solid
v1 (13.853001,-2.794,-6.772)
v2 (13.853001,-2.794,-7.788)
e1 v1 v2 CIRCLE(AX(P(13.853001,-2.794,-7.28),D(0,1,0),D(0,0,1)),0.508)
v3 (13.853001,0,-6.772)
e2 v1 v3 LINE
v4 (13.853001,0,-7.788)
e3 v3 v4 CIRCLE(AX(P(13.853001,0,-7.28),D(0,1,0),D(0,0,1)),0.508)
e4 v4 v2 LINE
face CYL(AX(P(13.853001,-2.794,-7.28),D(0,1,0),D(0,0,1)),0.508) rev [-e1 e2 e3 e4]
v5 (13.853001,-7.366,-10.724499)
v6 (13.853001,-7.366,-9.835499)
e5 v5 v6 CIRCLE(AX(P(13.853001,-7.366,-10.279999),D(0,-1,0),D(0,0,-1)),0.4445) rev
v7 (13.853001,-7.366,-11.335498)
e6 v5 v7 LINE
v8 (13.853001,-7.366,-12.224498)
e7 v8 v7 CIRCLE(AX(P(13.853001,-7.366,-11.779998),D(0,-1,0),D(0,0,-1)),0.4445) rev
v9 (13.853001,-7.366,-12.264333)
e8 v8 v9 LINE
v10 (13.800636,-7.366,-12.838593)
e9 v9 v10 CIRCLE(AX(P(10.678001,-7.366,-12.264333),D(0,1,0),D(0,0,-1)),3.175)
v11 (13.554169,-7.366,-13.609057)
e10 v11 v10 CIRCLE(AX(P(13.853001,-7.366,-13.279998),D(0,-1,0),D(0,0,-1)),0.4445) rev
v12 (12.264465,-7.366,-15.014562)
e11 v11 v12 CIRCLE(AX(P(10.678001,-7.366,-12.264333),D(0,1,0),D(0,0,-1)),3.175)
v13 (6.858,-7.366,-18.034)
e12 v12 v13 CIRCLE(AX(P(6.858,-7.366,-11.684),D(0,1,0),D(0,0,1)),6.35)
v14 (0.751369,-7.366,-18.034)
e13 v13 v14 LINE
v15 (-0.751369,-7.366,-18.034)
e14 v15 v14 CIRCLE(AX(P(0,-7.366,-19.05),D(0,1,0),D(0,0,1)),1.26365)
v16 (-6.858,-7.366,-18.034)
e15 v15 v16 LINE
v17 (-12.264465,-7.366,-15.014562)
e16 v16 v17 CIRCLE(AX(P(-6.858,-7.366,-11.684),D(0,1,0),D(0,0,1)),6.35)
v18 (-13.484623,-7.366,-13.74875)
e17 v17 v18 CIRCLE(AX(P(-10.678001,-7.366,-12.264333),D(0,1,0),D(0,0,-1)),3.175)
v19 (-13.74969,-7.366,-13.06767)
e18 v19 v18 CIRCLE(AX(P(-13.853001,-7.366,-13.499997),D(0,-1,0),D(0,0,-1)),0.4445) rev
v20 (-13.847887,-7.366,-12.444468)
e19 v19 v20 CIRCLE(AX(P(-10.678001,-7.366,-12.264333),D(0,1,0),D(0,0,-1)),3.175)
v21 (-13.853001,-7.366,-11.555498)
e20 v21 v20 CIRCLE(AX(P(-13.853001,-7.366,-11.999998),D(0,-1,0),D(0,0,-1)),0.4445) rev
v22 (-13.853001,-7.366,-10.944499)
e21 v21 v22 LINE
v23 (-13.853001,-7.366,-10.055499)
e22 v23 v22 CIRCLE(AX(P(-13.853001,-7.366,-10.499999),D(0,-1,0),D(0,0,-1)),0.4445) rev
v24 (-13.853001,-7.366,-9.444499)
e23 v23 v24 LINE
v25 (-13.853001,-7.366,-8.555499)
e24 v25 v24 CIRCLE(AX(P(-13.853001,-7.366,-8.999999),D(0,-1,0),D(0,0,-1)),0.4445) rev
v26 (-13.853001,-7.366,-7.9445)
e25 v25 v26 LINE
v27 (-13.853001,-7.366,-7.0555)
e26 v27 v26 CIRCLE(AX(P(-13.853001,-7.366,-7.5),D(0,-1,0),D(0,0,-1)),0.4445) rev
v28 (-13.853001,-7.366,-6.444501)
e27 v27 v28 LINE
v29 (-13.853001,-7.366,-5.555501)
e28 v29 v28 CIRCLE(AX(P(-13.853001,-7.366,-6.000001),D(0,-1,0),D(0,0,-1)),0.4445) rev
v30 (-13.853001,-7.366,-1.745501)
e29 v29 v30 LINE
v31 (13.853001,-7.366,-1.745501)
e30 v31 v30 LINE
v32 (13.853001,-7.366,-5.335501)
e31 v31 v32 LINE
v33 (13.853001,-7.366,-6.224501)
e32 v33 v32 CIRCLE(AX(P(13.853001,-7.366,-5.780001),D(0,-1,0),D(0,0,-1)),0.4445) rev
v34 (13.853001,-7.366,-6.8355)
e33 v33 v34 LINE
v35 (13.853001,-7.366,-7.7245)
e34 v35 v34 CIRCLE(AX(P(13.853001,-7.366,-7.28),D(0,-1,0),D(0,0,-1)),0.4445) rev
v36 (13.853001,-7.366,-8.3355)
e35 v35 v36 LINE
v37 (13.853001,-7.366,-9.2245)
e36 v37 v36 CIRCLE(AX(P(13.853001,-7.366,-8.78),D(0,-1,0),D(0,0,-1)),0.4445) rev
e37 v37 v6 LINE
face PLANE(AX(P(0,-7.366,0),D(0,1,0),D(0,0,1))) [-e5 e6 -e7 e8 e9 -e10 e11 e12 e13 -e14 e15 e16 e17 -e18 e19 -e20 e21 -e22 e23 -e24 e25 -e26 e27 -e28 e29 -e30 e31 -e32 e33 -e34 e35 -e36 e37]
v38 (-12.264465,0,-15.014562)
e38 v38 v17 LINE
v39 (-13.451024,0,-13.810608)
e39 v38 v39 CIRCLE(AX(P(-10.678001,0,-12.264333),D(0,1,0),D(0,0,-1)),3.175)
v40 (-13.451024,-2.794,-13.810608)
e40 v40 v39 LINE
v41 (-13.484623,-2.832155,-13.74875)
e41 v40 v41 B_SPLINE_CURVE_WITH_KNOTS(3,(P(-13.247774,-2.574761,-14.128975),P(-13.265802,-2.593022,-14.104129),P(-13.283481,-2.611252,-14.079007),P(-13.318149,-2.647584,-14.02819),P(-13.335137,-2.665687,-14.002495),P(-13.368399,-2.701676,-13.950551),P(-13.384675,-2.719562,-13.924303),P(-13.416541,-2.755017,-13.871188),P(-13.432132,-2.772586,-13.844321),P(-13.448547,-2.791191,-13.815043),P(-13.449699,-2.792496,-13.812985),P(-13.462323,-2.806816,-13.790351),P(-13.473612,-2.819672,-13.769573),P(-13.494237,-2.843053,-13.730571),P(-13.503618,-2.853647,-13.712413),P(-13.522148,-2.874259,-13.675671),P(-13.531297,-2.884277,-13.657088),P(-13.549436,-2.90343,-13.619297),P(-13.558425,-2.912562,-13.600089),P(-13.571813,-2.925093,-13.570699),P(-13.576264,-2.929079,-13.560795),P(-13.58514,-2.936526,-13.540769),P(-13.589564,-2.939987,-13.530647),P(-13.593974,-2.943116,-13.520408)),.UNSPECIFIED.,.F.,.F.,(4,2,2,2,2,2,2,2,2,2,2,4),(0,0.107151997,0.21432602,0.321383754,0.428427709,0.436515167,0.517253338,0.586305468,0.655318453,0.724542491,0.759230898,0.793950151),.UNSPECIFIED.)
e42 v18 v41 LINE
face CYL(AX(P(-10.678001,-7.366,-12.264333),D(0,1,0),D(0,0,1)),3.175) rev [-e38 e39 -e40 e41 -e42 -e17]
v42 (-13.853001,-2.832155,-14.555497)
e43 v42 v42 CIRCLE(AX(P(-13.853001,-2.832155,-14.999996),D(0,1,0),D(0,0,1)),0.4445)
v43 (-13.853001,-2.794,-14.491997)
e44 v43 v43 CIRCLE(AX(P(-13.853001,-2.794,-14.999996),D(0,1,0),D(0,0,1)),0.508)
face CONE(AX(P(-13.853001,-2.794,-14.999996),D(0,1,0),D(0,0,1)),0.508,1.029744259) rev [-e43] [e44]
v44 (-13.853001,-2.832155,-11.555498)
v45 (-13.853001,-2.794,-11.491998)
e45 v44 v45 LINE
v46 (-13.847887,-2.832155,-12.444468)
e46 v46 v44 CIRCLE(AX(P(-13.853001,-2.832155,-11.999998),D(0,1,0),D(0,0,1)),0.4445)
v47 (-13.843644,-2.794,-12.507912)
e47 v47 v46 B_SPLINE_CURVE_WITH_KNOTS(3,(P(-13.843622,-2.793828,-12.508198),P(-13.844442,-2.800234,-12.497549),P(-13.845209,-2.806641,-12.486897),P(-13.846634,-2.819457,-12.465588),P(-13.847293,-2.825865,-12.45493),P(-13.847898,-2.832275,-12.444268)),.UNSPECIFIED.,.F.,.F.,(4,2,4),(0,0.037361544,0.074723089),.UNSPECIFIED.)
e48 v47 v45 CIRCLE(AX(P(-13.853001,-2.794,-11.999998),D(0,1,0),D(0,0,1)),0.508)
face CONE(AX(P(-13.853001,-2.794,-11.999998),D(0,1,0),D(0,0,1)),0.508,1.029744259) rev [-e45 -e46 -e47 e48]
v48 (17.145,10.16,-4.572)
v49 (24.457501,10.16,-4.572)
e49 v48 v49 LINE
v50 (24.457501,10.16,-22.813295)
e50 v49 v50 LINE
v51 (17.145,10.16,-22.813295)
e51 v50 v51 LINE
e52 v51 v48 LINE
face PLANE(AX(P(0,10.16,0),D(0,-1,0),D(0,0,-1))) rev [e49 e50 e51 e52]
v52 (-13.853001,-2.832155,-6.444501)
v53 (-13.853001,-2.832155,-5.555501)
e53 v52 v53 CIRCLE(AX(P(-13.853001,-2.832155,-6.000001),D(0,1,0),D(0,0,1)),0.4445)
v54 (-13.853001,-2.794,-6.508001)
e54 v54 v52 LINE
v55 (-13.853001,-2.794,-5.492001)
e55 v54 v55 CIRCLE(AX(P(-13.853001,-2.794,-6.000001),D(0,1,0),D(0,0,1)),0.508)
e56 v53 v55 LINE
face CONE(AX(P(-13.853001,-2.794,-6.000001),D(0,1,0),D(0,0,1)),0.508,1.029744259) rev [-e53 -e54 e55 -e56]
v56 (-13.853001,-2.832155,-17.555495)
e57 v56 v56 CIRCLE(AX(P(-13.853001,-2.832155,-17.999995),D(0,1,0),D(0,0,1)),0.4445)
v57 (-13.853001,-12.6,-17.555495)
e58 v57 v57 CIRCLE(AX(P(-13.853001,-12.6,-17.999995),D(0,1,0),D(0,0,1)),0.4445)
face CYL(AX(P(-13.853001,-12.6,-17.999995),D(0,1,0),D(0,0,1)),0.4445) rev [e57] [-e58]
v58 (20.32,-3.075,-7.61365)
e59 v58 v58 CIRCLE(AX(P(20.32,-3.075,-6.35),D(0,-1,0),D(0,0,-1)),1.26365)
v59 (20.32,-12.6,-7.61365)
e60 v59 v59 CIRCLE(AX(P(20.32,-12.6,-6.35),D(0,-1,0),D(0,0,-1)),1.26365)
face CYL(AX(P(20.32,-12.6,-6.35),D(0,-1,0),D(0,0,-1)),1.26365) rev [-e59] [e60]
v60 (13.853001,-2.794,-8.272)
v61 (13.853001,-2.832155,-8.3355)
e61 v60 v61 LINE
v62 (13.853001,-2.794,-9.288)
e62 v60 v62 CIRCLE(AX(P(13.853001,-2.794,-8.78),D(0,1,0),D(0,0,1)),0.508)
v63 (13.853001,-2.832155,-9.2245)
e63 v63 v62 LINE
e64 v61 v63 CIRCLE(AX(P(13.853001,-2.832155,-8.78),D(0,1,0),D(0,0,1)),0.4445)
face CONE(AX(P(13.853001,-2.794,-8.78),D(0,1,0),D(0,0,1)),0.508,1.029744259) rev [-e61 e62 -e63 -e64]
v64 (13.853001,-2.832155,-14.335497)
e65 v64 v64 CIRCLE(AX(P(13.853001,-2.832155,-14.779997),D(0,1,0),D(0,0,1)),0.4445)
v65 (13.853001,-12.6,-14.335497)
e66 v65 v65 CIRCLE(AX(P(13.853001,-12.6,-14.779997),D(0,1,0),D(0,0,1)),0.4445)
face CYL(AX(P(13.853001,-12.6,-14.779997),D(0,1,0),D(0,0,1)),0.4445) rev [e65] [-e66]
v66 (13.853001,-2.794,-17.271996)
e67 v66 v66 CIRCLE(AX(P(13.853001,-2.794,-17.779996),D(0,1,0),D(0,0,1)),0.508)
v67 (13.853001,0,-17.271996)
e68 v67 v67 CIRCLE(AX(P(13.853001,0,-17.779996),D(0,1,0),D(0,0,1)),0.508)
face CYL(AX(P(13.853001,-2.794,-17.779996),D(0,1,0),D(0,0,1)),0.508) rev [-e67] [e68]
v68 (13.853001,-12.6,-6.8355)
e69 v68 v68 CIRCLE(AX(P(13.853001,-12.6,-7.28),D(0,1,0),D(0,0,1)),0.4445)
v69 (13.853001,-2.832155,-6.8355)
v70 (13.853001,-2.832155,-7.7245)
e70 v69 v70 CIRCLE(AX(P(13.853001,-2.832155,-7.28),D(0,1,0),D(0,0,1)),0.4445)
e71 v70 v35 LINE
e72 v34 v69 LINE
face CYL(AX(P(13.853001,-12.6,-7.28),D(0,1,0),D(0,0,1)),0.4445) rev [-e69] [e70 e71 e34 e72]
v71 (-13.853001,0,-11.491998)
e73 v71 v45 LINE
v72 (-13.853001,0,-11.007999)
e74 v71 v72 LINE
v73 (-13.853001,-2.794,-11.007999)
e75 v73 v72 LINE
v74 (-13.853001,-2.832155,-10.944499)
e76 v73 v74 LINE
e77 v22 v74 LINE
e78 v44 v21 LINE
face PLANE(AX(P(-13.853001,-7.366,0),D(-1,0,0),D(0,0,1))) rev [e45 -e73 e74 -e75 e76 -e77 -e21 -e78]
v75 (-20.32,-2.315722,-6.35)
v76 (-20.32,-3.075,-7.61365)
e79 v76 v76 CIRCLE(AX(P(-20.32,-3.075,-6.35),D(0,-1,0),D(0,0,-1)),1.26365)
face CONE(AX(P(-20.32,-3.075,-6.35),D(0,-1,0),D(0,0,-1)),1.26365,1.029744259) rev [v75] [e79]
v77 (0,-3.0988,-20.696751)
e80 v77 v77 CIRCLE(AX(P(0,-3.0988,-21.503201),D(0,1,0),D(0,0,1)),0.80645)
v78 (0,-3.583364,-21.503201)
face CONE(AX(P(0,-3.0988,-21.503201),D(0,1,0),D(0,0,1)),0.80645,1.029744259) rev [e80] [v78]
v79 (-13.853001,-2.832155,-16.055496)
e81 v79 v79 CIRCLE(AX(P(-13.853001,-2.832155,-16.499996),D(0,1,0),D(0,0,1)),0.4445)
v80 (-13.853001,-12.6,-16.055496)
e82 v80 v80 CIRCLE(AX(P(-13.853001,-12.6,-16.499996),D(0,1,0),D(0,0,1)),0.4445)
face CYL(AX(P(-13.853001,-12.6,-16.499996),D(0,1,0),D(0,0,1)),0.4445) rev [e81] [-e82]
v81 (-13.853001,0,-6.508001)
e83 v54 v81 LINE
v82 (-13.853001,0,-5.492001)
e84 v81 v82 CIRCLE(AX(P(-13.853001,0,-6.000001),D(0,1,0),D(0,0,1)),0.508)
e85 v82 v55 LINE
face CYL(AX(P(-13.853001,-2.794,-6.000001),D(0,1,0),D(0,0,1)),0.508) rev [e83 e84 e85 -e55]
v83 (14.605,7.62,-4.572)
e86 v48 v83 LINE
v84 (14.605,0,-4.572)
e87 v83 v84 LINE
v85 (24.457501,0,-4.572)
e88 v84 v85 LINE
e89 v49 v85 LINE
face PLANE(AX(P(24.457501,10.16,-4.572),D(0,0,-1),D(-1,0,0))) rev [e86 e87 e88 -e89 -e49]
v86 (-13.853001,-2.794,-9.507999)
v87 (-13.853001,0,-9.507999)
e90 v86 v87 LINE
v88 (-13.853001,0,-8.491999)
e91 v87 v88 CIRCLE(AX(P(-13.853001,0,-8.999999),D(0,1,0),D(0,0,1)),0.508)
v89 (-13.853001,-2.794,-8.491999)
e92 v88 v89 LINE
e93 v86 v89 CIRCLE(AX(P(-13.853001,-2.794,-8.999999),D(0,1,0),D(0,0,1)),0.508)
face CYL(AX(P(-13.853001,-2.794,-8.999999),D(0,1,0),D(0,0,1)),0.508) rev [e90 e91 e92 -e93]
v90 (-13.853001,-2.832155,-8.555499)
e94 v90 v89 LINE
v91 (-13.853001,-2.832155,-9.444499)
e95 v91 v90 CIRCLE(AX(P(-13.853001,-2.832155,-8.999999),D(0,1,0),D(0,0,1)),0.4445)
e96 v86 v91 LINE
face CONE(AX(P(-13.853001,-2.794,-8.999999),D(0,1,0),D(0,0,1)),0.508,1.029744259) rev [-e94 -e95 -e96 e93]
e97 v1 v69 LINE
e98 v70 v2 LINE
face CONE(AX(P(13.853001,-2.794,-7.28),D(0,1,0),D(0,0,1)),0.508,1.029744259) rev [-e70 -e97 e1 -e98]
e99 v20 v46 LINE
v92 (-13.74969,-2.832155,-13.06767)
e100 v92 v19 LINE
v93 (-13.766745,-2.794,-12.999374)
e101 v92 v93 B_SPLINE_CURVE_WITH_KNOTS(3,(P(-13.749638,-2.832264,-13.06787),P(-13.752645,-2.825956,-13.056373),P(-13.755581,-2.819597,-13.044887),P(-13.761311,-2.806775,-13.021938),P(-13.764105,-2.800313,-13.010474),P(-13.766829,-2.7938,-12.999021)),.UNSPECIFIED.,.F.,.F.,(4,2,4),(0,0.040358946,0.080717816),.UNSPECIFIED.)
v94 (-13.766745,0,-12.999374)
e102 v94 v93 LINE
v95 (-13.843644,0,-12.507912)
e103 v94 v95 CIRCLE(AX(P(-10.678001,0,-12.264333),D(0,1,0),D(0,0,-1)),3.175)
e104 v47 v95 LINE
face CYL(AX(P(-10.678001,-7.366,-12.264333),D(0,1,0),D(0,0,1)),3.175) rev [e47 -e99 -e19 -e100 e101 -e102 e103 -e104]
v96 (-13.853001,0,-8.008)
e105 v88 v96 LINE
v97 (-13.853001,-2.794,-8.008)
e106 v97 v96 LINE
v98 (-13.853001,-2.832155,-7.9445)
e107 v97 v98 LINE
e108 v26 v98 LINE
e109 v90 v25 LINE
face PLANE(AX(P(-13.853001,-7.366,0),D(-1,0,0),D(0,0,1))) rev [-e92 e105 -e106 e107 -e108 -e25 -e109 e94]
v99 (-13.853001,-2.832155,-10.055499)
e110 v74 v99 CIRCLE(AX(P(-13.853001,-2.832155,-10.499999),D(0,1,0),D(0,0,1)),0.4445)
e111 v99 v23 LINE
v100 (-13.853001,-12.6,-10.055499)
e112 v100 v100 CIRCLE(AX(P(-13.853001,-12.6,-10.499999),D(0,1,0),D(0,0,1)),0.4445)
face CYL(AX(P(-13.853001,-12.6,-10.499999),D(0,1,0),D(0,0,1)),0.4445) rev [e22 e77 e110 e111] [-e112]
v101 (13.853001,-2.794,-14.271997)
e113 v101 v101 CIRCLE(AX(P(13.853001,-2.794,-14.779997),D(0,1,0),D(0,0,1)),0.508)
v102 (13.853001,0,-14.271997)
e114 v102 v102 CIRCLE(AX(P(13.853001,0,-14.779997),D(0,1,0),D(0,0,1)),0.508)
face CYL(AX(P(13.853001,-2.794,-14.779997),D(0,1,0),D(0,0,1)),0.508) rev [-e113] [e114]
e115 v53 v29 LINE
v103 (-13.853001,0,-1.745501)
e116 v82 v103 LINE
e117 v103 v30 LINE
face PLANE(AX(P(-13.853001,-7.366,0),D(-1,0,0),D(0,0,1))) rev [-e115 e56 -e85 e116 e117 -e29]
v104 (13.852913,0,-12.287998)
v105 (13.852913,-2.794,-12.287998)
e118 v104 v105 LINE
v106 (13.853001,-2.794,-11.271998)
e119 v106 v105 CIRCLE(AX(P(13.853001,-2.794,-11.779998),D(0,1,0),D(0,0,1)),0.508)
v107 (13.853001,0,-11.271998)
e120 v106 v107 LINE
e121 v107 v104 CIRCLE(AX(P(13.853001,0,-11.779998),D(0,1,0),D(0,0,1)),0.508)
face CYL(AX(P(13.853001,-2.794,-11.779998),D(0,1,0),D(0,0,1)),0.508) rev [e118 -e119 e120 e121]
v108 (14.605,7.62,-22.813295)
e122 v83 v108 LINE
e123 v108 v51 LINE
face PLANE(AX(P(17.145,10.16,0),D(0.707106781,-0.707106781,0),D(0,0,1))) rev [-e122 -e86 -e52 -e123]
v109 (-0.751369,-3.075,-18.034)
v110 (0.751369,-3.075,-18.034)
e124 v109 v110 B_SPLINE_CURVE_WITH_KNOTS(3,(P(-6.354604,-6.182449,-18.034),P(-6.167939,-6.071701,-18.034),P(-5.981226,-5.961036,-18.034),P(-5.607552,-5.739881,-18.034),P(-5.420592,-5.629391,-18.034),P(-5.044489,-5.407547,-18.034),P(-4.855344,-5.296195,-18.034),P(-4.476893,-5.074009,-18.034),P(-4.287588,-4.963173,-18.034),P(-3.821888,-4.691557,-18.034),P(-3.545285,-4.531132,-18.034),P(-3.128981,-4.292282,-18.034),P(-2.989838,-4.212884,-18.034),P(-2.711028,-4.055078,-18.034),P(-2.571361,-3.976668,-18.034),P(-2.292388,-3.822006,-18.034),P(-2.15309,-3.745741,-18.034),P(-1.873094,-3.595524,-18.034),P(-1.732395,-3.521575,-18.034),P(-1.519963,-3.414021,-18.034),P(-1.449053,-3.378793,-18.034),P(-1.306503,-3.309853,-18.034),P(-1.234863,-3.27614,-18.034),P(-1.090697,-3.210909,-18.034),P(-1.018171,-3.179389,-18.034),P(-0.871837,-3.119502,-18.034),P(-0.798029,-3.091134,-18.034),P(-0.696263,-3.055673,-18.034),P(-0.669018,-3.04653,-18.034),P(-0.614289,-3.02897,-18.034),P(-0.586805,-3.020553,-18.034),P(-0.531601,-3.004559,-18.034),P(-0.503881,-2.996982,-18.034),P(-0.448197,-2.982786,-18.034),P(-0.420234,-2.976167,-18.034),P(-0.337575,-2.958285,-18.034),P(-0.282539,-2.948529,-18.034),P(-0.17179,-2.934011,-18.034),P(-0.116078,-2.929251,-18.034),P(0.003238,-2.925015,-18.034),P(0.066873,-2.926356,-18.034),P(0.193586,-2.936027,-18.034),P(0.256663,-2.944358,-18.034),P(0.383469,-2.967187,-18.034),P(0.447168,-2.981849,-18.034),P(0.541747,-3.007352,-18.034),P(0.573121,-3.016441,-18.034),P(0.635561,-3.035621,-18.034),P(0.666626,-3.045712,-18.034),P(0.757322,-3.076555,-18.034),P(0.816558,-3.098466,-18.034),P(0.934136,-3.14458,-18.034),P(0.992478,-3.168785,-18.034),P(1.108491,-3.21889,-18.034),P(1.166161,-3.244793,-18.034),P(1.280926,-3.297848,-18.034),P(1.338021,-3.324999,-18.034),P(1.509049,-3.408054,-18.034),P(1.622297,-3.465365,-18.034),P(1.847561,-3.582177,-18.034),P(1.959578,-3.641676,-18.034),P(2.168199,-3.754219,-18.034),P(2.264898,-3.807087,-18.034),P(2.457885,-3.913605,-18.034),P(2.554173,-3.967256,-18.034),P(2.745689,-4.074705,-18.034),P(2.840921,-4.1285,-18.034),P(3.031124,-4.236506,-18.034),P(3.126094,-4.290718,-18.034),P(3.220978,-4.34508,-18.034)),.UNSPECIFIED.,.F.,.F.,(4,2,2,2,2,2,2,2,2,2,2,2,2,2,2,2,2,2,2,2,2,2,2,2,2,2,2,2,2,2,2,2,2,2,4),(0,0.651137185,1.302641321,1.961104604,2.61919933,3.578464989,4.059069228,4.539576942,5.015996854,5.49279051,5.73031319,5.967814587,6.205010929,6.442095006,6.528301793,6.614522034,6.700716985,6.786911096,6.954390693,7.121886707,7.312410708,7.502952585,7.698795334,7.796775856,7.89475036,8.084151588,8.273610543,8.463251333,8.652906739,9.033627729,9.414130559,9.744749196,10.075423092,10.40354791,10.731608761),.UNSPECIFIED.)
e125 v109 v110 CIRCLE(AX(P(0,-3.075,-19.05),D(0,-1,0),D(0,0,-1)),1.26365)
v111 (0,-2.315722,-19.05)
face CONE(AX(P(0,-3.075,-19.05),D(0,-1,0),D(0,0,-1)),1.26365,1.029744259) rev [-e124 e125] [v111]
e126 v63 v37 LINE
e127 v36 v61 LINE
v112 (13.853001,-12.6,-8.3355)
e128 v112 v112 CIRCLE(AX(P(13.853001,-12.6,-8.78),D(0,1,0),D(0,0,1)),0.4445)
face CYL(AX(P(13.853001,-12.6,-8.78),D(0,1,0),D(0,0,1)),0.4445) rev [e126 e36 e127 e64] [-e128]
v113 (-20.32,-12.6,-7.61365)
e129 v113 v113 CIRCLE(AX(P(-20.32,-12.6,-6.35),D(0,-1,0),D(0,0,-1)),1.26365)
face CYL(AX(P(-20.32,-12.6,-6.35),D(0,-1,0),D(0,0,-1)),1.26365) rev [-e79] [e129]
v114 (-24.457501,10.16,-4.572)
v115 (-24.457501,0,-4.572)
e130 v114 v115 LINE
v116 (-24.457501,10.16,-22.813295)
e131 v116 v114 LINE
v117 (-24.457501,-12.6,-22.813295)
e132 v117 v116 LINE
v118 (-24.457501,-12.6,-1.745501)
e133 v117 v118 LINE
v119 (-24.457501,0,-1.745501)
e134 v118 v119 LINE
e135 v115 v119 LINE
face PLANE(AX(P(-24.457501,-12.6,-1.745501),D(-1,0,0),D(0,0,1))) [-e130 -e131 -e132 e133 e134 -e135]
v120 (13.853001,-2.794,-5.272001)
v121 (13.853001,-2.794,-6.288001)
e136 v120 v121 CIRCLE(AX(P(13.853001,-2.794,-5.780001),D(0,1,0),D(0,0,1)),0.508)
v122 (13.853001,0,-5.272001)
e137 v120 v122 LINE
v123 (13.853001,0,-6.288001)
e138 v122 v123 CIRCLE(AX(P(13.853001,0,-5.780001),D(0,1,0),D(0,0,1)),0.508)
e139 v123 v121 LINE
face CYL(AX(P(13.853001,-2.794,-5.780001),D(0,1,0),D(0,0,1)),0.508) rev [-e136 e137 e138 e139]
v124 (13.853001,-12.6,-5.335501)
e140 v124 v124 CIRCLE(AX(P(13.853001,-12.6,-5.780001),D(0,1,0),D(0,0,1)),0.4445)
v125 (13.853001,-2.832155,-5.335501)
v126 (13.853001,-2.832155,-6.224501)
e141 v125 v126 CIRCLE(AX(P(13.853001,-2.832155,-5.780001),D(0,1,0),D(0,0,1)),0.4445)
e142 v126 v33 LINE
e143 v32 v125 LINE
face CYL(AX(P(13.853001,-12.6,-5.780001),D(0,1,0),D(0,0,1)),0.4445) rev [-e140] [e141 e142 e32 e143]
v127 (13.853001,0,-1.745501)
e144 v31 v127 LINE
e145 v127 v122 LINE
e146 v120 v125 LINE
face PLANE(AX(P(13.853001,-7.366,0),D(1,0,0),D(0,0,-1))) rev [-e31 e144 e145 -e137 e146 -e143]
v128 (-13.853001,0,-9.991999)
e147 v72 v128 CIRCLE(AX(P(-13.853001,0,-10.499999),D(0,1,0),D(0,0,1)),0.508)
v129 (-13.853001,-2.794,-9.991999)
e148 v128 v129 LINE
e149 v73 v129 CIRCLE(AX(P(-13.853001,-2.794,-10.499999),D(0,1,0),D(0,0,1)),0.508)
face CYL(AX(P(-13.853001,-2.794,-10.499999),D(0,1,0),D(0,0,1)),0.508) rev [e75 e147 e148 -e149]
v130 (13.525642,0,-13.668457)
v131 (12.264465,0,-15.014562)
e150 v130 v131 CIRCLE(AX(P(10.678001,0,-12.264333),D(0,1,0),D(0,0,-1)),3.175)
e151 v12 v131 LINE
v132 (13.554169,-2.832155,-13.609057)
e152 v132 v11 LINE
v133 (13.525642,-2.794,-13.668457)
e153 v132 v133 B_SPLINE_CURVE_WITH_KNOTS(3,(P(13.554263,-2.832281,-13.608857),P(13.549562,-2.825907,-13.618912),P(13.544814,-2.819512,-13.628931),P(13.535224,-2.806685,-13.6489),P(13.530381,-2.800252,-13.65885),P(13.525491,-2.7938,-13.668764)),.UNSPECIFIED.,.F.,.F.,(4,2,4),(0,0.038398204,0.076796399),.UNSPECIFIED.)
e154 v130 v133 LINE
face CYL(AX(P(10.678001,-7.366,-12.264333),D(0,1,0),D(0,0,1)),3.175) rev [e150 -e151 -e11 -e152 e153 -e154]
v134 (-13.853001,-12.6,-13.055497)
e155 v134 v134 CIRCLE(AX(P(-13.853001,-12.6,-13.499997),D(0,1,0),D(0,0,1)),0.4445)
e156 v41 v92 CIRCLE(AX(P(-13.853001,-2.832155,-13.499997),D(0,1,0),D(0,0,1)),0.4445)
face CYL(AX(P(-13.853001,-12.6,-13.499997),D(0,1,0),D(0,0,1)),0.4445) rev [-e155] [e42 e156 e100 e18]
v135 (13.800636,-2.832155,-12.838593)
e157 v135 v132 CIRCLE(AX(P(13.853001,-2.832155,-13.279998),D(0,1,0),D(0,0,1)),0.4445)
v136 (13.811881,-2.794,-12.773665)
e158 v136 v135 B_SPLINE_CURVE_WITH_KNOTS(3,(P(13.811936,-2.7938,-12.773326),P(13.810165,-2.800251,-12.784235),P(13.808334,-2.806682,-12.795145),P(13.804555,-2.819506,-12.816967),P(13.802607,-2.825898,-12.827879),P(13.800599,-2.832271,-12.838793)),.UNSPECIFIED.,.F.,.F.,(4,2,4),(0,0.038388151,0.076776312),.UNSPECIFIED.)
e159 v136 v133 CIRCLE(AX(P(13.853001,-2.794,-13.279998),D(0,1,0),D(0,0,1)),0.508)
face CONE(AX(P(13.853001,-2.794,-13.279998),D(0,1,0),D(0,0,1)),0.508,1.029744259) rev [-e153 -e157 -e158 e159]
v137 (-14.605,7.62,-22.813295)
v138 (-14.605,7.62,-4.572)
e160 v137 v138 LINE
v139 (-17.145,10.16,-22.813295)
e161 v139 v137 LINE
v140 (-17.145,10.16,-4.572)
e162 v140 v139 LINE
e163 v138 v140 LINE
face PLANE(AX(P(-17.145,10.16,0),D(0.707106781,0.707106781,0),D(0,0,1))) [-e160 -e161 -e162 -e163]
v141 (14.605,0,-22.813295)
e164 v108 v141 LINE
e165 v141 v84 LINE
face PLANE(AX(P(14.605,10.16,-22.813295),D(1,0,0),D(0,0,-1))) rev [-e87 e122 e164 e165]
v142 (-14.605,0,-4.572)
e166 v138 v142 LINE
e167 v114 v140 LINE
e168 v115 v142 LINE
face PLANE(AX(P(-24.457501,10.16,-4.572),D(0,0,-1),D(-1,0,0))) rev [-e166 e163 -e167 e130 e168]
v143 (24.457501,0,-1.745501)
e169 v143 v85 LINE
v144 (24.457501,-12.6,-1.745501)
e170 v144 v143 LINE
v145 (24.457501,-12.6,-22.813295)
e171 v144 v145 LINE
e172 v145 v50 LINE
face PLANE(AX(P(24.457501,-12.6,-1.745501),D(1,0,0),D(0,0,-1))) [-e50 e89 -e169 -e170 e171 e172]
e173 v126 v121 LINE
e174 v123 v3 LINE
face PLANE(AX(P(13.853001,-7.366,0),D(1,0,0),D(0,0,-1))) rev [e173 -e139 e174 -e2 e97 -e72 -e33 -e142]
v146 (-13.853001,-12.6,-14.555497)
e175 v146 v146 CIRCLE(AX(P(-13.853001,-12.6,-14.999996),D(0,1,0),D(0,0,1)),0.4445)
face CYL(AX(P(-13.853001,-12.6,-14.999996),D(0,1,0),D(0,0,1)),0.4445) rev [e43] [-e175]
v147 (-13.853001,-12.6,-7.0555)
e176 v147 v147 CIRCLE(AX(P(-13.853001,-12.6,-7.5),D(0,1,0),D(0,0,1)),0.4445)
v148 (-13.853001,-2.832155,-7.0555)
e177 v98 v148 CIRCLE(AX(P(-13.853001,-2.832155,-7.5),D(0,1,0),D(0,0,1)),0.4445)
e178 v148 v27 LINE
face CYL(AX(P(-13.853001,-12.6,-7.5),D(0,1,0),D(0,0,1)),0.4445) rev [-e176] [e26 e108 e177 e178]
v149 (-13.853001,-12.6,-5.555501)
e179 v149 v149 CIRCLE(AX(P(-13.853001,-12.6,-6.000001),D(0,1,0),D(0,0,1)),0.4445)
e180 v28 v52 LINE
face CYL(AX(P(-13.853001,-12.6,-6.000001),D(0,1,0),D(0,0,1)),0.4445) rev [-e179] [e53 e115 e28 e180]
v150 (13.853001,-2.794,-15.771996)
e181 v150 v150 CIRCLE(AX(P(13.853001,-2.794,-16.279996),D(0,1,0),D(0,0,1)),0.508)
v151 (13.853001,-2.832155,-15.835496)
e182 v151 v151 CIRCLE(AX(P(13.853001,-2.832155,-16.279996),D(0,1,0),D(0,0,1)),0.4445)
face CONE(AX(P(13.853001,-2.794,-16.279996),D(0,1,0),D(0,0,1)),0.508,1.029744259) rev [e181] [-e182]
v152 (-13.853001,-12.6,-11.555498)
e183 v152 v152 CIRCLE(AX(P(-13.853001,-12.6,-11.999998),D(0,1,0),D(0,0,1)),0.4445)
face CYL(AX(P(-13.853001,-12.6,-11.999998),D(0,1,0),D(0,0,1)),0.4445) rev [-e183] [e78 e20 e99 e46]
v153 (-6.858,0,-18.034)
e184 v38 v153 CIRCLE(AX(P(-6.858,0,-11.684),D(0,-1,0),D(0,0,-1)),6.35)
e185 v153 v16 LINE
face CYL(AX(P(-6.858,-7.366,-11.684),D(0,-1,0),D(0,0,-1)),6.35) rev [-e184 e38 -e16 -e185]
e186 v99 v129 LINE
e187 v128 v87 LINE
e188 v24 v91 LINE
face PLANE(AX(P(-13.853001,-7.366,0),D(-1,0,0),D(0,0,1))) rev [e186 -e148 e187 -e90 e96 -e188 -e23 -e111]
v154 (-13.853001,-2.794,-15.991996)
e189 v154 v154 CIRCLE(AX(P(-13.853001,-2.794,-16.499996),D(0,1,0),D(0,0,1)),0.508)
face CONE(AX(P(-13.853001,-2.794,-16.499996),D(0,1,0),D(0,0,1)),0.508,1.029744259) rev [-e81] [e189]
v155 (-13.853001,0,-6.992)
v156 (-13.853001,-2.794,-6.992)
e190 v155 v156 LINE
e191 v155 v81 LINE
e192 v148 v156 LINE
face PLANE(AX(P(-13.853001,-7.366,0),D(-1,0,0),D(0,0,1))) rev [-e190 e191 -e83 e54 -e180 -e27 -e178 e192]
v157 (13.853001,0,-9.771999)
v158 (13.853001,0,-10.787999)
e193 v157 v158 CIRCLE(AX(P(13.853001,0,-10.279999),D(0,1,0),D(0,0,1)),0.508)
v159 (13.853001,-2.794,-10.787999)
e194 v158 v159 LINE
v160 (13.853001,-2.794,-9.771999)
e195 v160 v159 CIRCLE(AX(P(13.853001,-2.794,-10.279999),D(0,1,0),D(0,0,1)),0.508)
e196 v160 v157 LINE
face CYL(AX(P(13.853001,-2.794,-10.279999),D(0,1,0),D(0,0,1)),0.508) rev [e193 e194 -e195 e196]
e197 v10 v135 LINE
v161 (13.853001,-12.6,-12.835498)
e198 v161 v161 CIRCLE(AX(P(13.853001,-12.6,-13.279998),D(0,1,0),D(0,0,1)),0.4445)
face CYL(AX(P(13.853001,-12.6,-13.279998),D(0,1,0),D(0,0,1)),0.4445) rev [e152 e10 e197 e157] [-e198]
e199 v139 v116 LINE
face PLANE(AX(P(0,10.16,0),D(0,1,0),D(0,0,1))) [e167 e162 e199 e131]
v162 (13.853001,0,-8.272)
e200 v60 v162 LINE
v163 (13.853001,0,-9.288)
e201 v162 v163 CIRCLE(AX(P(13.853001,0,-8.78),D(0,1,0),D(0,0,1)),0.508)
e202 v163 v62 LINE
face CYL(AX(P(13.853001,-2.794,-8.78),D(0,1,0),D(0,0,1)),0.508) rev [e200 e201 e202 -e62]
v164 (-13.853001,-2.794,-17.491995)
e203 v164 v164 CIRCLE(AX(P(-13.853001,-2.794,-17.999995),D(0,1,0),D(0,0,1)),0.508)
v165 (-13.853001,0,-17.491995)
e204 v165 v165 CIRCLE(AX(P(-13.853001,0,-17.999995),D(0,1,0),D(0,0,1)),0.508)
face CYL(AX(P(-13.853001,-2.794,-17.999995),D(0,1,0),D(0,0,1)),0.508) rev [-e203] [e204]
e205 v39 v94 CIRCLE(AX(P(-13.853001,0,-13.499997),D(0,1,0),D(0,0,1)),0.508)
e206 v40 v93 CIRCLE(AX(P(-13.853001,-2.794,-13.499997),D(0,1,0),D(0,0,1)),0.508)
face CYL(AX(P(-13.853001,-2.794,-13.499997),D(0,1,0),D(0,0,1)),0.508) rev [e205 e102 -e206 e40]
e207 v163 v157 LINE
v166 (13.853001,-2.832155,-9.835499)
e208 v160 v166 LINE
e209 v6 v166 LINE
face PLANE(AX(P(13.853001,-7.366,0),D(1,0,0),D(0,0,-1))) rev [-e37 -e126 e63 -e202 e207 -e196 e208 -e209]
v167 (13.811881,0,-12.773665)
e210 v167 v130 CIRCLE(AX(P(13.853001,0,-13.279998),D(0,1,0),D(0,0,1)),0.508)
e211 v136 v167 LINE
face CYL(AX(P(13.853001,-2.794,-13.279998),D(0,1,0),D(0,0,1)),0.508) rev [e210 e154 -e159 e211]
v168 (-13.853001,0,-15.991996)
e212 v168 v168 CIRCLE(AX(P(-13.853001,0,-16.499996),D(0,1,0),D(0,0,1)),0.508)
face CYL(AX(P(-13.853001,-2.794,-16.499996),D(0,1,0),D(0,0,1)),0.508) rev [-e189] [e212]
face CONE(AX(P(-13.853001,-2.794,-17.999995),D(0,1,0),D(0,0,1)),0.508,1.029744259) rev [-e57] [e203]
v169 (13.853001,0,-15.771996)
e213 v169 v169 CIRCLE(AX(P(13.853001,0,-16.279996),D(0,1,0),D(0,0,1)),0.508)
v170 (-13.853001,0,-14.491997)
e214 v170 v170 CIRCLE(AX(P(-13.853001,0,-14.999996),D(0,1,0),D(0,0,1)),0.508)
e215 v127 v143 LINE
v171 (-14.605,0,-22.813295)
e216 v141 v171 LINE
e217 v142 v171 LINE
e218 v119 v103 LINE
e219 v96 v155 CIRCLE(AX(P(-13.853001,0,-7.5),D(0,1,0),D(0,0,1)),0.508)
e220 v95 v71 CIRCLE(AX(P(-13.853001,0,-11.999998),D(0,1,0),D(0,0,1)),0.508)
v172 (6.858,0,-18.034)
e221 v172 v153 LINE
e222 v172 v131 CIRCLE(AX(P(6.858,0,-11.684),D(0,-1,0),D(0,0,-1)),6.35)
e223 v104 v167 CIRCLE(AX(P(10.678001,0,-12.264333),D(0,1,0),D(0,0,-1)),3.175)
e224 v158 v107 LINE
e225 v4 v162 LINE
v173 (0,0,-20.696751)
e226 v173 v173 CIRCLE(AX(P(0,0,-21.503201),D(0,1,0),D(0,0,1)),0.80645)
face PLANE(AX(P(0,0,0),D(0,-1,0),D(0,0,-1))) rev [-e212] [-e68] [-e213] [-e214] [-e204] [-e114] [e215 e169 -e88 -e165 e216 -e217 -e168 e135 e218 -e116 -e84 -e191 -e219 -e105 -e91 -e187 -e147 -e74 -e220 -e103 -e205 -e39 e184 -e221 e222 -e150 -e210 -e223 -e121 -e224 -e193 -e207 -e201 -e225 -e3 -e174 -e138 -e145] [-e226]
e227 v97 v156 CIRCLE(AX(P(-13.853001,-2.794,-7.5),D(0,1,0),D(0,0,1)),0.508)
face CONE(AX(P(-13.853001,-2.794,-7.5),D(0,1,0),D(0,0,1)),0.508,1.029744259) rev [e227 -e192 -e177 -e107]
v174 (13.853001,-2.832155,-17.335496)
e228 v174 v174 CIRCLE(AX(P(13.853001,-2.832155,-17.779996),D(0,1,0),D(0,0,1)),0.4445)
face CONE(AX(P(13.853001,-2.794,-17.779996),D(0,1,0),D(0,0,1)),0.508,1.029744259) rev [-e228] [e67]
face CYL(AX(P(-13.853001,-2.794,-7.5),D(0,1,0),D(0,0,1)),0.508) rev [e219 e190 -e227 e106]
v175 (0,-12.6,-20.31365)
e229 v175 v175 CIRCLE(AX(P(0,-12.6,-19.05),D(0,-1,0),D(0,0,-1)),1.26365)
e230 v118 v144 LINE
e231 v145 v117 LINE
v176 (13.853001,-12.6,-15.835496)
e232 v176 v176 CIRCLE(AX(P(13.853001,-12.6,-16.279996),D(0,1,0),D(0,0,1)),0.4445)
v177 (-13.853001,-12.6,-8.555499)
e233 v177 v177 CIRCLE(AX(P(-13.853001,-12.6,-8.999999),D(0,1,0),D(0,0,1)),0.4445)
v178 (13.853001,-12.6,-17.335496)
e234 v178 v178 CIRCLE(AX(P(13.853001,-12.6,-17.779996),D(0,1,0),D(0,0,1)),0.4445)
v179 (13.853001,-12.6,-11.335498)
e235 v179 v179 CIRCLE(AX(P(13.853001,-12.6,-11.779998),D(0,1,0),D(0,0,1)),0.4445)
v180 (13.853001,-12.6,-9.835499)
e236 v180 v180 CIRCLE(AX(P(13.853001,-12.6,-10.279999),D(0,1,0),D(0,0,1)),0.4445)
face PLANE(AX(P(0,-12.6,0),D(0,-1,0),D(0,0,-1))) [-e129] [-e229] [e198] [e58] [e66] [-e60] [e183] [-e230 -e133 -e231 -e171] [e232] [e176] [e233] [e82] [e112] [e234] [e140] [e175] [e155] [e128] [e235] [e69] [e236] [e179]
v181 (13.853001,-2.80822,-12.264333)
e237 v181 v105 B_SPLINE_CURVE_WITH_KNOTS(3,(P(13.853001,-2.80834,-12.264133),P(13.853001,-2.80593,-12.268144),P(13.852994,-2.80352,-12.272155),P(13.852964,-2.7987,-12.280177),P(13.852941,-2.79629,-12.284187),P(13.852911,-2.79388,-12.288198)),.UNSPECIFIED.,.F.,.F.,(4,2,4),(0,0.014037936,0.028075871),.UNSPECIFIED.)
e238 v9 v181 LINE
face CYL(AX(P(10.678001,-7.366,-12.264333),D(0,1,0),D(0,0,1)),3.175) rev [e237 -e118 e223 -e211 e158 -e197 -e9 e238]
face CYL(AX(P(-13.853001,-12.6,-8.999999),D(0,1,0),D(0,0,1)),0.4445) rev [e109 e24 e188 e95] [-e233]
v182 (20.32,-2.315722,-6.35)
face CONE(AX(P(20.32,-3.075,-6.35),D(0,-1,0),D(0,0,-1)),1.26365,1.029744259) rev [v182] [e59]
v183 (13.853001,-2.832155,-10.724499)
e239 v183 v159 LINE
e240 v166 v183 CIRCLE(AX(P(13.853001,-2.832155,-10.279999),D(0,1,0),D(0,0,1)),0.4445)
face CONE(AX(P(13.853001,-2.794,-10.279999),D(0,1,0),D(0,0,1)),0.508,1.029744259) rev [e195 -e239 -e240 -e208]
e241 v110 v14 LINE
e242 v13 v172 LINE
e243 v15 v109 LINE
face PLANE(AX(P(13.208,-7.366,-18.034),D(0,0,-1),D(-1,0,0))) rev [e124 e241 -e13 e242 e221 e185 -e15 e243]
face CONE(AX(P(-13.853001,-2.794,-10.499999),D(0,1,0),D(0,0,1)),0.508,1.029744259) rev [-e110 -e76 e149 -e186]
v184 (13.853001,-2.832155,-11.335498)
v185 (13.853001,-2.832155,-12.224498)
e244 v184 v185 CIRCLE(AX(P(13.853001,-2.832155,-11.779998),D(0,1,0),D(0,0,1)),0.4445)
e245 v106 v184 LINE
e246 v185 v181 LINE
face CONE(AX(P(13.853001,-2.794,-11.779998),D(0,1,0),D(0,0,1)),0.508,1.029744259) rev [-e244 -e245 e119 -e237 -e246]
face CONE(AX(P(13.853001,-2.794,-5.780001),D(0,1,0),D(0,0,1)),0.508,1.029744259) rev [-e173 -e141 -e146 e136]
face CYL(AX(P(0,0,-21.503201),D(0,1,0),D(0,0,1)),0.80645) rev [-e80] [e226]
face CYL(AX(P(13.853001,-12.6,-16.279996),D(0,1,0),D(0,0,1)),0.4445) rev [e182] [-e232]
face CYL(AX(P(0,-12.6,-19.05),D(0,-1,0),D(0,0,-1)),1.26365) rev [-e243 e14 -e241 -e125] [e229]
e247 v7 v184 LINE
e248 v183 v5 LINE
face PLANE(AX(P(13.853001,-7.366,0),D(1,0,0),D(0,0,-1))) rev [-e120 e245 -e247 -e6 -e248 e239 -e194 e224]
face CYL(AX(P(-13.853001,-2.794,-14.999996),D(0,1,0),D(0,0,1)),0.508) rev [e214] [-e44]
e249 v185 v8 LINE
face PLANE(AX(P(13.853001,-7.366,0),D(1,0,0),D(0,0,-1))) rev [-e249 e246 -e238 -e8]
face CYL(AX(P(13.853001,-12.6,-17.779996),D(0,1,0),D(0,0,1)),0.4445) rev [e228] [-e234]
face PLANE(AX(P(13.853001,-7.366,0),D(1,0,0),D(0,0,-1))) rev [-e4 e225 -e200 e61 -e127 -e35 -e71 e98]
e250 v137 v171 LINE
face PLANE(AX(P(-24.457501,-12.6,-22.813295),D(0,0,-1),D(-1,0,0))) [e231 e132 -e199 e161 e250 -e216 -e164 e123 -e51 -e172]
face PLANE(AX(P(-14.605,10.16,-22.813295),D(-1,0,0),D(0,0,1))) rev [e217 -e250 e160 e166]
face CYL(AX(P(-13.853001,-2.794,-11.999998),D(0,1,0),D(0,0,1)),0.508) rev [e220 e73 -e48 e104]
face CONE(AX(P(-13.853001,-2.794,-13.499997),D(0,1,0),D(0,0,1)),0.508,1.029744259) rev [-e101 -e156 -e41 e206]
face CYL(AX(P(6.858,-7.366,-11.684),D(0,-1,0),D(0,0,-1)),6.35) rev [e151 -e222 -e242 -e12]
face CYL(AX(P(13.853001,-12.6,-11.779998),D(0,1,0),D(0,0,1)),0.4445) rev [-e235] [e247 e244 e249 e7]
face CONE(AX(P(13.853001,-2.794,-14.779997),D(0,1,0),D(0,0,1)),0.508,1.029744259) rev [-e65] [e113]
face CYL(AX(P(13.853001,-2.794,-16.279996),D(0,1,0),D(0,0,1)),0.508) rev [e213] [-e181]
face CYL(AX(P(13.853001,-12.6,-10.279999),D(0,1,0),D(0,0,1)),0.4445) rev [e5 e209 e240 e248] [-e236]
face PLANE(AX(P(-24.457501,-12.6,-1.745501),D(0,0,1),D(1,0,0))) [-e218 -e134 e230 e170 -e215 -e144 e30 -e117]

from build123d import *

# Parameters (mm, degrees)
SKETCH2_W                        = 48.915002
SKETCH2_H                        = 21.0677944
BOSS_EXTRUDE1_DEPTH              = 12.599999946
SKETCH1_R                        = 0.4445
CUT_EXTRUDE1_DEPTH               = 36.740394334
SKETCH3_R                        = 0.508
CUT_EXTRUDE2_DEPTH               = 2.794
SKETCH4_W                        = 9.852501
SKETCH4_H                        = 18.2412951
BOSS_EXTRUDE2_DEPTH              = 10.16
CHAMFER1_SIZE                    = 2.54
SKETCH5_W                        = 26.416
SKETCH5_H                        = 26.766649332
CUT_EXTRUDE3_DEPTH               = 7.366
FILLET1_R                        = 6.35
F_52_0_0635_DIAMETER_HOLE1_D     = 1.6129
F_52_0_0635_DIAMETER_HOLE1_DEPTH = 3.0988
F_52_0_0635_DIAMETER_HOLE1_TIP   = 0.484564046
CUT_EXTRUDE4_DEPTH               = 7.366
F_39_0_0995_DIAMETER_HOLE1_D     = 2.5273
F_39_0_0995_DIAMETER_HOLE1_DEPTH = 9.525
F_39_0_0995_DIAMETER_HOLE1_TIP   = 0.759277521


# Read off the part's stored shape, not the designer's step: Cut-Extrude6
with BuildPart() as part:
    # Sketch2 → Boss-Extrude1 (new body)
    with BuildSketch(Plane(origin=(0, 0, 0), x_dir=(1, 0, 0), z_dir=(0, 1, 0))):
        with Locations((0, 12.2793979)):
            Rectangle(SKETCH2_W, SKETCH2_H)
    extrude(amount=-BOSS_EXTRUDE1_DEPTH)

    # Sketch1 → Cut-Extrude1 (cut, through all)
    with BuildSketch(Plane(origin=(0, 0, 0), x_dir=(1, 0, 0), z_dir=(0, 1, 0))):
        with Locations(Location((-13.853001, 6.0000007, 0), (0, 0, 270))):
            Circle(SKETCH1_R)
        with Locations(Location((13.853001, 5.78000114, 0), (0, 0, 270))):
            Circle(SKETCH1_R)
        with Locations(Location((-13.853001, 7.5, 0), (0, 0, 270))):
            Circle(SKETCH1_R)
        with Locations(Location((13.853001, 7.28000044, 0), (0, 0, 270))):
            Circle(SKETCH1_R)
        with Locations(Location((-13.853001, 8.9999993, 0), (0, 0, 270))):
            Circle(SKETCH1_R)
        with Locations(Location((13.853001, 8.77999974, 0), (0, 0, 270))):
            Circle(SKETCH1_R)
        with Locations(Location((-13.853001, 10.4999986, 0), (0, 0, 270))):
            Circle(SKETCH1_R)
        with Locations(Location((13.853001, 10.27999904, 0), (0, 0, 270))):
            Circle(SKETCH1_R)
        with Locations(Location((-13.853001, 11.9999979, 0), (0, 0, 270))):
            Circle(SKETCH1_R)
        with Locations(Location((13.853001, 11.77999834, 0), (0, 0, 270))):
            Circle(SKETCH1_R)
        with Locations(Location((-13.853001, 13.4999972, 0), (0, 0, 270))):
            Circle(SKETCH1_R)
        with Locations(Location((13.853001, 13.27999764, 0), (0, 0, 270))):
            Circle(SKETCH1_R)
        with Locations(Location((-13.853001, 14.9999965, 0), (0, 0, 270))):
            Circle(SKETCH1_R)
        with Locations(Location((13.853001, 14.77999694, 0), (0, 0, 270))):
            Circle(SKETCH1_R)
        with Locations(Location((-13.853001, 16.4999958, 0), (0, 0, 270))):
            Circle(SKETCH1_R)
        with Locations(Location((13.853001, 16.27999624, 0), (0, 0, 270))):
            Circle(SKETCH1_R)
        with Locations(Location((-13.853001, 17.9999951, 0), (0, 0, 270))):
            Circle(SKETCH1_R)
        with Locations(Location((13.853001, 17.77999554, 0), (0, 0, 270))):
            Circle(SKETCH1_R)
    extrude(amount=-CUT_EXTRUDE1_DEPTH, mode=Mode.SUBTRACT)

    # Sketch3 → Cut-Extrude2 (cut)
    with BuildSketch(Plane(origin=(0, 0, 0), x_dir=(1, 0, 0), z_dir=(0, 1, 0))):
        with Locations(Location((-13.853001, 6.0000007, 0), (0, 0, 270))):
            Circle(SKETCH3_R)
        with Locations(Location((13.853001, 5.78000114, 0), (0, 0, 270))):
            Circle(SKETCH3_R)
        with Locations(Location((-13.853001, 7.5, 0), (0, 0, 270))):
            Circle(SKETCH3_R)
        with Locations(Location((13.853001, 7.28000044, 0), (0, 0, 270))):
            Circle(SKETCH3_R)
        with Locations(Location((-13.853001, 8.9999993, 0), (0, 0, 270))):
            Circle(SKETCH3_R)
        with Locations(Location((13.853001, 8.77999974, 0), (0, 0, 270))):
            Circle(SKETCH3_R)
        with Locations(Location((-13.853001, 10.4999986, 0), (0, 0, 270))):
            Circle(SKETCH3_R)
        with Locations(Location((13.853001, 10.27999904, 0), (0, 0, 270))):
            Circle(SKETCH3_R)
        with Locations(Location((-13.853001, 11.9999979, 0), (0, 0, 270))):
            Circle(SKETCH3_R)
        with Locations(Location((13.853001, 11.77999834, 0), (0, 0, 270))):
            Circle(SKETCH3_R)
        with Locations(Location((-13.853001, 13.4999972, 0), (0, 0, 270))):
            Circle(SKETCH3_R)
        with Locations(Location((13.853001, 13.27999764, 0), (0, 0, 270))):
            Circle(SKETCH3_R)
        with Locations(Location((-13.853001, 14.9999965, 0), (0, 0, 270))):
            Circle(SKETCH3_R)
        with Locations(Location((13.853001, 14.77999694, 0), (0, 0, 270))):
            Circle(SKETCH3_R)
        with Locations(Location((-13.853001, 16.4999958, 0), (0, 0, 270))):
            Circle(SKETCH3_R)
        with Locations(Location((13.853001, 16.27999624, 0), (0, 0, 270))):
            Circle(SKETCH3_R)
        with Locations(Location((-13.853001, 17.9999951, 0), (0, 0, 270))):
            Circle(SKETCH3_R)
        with Locations(Location((13.853001, 17.77999554, 0), (0, 0, 270))):
            Circle(SKETCH3_R)
    extrude(amount=-CUT_EXTRUDE2_DEPTH, mode=Mode.SUBTRACT)

    # Sketch4 → Boss-Extrude2 (add)
    with BuildSketch(Plane(origin=(0, 0, 0), x_dir=(1, 0, 0), z_dir=(0, 1, 0))):
        with Locations((-19.5312505, 13.69264755)):
            Rectangle(SKETCH4_W, SKETCH4_H)
        with Locations((19.5312505, 13.69264755)):
            Rectangle(SKETCH4_W, SKETCH4_H)
    extrude(amount=BOSS_EXTRUDE2_DEPTH)

    # Chamfer1
    chamfer1_edges = [part.edges().sort_by_distance(p)[0] for p in [
        (14.605, 10.16, -13.69264755),
        (-14.605, 10.16, -13.69264755),
    ]]
    chamfer(chamfer1_edges, length=CHAMFER1_SIZE)

    # Sketch5 → Cut-Extrude3 (cut)
    with BuildSketch(Plane(origin=(0, 0, 0), x_dir=(1, 0, 0), z_dir=(0, 1, 0))):
        with Locations((0, 4.650675334)):
            Rectangle(SKETCH5_W, SKETCH5_H)
    extrude(amount=-CUT_EXTRUDE3_DEPTH, mode=Mode.SUBTRACT)

    # Fillet1
    fillet1_edges = [part.edges().sort_by_distance(p)[0] for p in [
        (13.208, -3.683, -18.034),
        (-13.208, -3.683, -18.034),
    ]]
    fillet(fillet1_edges, radius=FILLET1_R)

    # #52 (0.0635) Diameter Hole1
    with Locations(Plane(origin=(0, 0, 0), x_dir=(1, 0, 0), z_dir=(0, 1, 0))):
        with Locations((0, 21.50320058)):
            Hole(F_52_0_0635_DIAMETER_HOLE1_D / 2, depth=F_52_0_0635_DIAMETER_HOLE1_DEPTH)
            with Locations((0, 0, -(F_52_0_0635_DIAMETER_HOLE1_DEPTH + F_52_0_0635_DIAMETER_HOLE1_TIP / 2))):  # 118° drill point
                Cone(0, F_52_0_0635_DIAMETER_HOLE1_D / 2, F_52_0_0635_DIAMETER_HOLE1_TIP, mode=Mode.SUBTRACT)

    # Sketch9 → Cut-Extrude4 (cut)
    with BuildSketch(Plane(origin=(0, 0, 0), x_dir=(1, 0, 0), z_dir=(0, 1, 0))):
        with BuildLine():
            Line((-13.853001, 0), (13.853001, 0))
            Line((13.853001, 0), (13.853001, 12.264332778))
            ThreePointArc((13.853001, 12.264332778), (12.92306503, 14.509396808), (10.678001, 15.439332778))
            Line((10.678001, 15.439332778), (-10.678001, 15.439332778))
            ThreePointArc((-10.678001, 15.439332778), (-12.92306503, 14.509396808), (-13.853001, 12.264332778))
            Line((-13.853001, 12.264332778), (-13.853001, 0))
        make_face()
    extrude(amount=-CUT_EXTRUDE4_DEPTH, mode=Mode.SUBTRACT)

    # Cut-Extrude6 outline → Cut-Extrude6 (revolve, cut)
    with BuildSketch(Plane(origin=(-13.853001, 0, -6.0000007), x_dir=(1, 0, 0), z_dir=(0, 0, 1))):
        Polygon((0.4445, -2.794), (0.4445, -2.832154649), (0.508, -2.794), align=None)
    revolve(axis=Axis((-13.853001, 0, -6.0000007), (0, 1, 0)), mode=Mode.SUBTRACT)

    # Cut-Extrude6 2 outline → Cut-Extrude6 2 (revolve, cut)
    with BuildSketch(Plane(origin=(13.853001, 0, -5.78000114), x_dir=(1, 0, 0), z_dir=(0, 0, 1))):
        Polygon((0.4445, -2.794), (0.4445, -2.832154649), (0.508, -2.794), align=None)
    revolve(axis=Axis((13.853001, 0, -5.78000114), (0, 1, 0)), mode=Mode.SUBTRACT)

    # Cut-Extrude6 3 outline → Cut-Extrude6 3 (revolve, cut)
    with BuildSketch(Plane(origin=(-13.853001, 0, -7.5), x_dir=(1, 0, 0), z_dir=(0, 0, 1))):
        Polygon((0.4445, -2.794), (0.4445, -2.832154649), (0.508, -2.794), align=None)
    revolve(axis=Axis((-13.853001, 0, -7.5), (0, 1, 0)), mode=Mode.SUBTRACT)

    # Cut-Extrude6 4 outline → Cut-Extrude6 4 (revolve, cut)
    with BuildSketch(Plane(origin=(13.853001, 0, -7.28000044), x_dir=(1, 0, 0), z_dir=(0, 0, 1))):
        Polygon((0.4445, -2.794), (0.4445, -2.832154649), (0.508, -2.794), align=None)
    revolve(axis=Axis((13.853001, 0, -7.28000044), (0, 1, 0)), mode=Mode.SUBTRACT)

    # Cut-Extrude6 5 outline → Cut-Extrude6 5 (revolve, cut)
    with BuildSketch(Plane(origin=(-13.853001, 0, -8.9999993), x_dir=(1, 0, 0), z_dir=(0, 0, 1))):
        Polygon((0.4445, -2.794), (0.4445, -2.832154649), (0.508, -2.794), align=None)
    revolve(axis=Axis((-13.853001, 0, -8.9999993), (0, 1, 0)), mode=Mode.SUBTRACT)

    # Cut-Extrude6 6 outline → Cut-Extrude6 6 (revolve, cut)
    with BuildSketch(Plane(origin=(13.853001, 0, -8.77999974), x_dir=(1, 0, 0), z_dir=(0, 0, 1))):
        Polygon((0.4445, -2.794), (0.4445, -2.832154649), (0.508, -2.794), align=None)
    revolve(axis=Axis((13.853001, 0, -8.77999974), (0, 1, 0)), mode=Mode.SUBTRACT)

    # Cut-Extrude6 7 outline → Cut-Extrude6 7 (revolve, cut)
    with BuildSketch(Plane(origin=(-13.853001, 0, -10.4999986), x_dir=(1, 0, 0), z_dir=(0, 0, 1))):
        Polygon((0.4445, -2.794), (0.4445, -2.832154649), (0.508, -2.794), align=None)
    revolve(axis=Axis((-13.853001, 0, -10.4999986), (0, 1, 0)), mode=Mode.SUBTRACT)

    # Cut-Extrude6 8 outline → Cut-Extrude6 8 (revolve, cut)
    with BuildSketch(Plane(origin=(13.853001, 0, -10.27999904), x_dir=(1, 0, 0), z_dir=(0, 0, 1))):
        Polygon((0.4445, -2.794), (0.4445, -2.832154649), (0.508, -2.794), align=None)
    revolve(axis=Axis((13.853001, 0, -10.27999904), (0, 1, 0)), mode=Mode.SUBTRACT)

    # Cut-Extrude6 9 outline → Cut-Extrude6 9 (revolve, cut)
    with BuildSketch(Plane(origin=(-13.853001, 0, -11.9999979), x_dir=(1, 0, 0), z_dir=(0, 0, 1))):
        Polygon((0.4445, -2.794), (0.4445, -2.832154649), (0.508, -2.794), align=None)
    revolve(axis=Axis((-13.853001, 0, -11.9999979), (0, 1, 0)), mode=Mode.SUBTRACT)

    # Cut-Extrude6 10 outline → Cut-Extrude6 10 (revolve, cut)
    with BuildSketch(Plane(origin=(13.853001, 0, -11.77999834), x_dir=(1, 0, 0), z_dir=(0, 0, 1))):
        Polygon((0.4445, -2.794), (0.4445, -2.832154649), (0.508, -2.794), align=None)
    revolve(axis=Axis((13.853001, 0, -11.77999834), (0, 1, 0)), mode=Mode.SUBTRACT)

    # Cut-Extrude6 11 outline → Cut-Extrude6 11 (revolve, cut)
    with BuildSketch(Plane(origin=(-13.853001, 0, -13.4999972), x_dir=(1, 0, 0), z_dir=(0, 0, 1))):
        Polygon((0.4445, -2.794), (0.4445, -2.832154649), (0.508, -2.794), align=None)
    revolve(axis=Axis((-13.853001, 0, -13.4999972), (0, 1, 0)), mode=Mode.SUBTRACT)

    # Cut-Extrude6 12 outline → Cut-Extrude6 12 (revolve, cut)
    with BuildSketch(Plane(origin=(13.853001, 0, -13.27999764), x_dir=(1, 0, 0), z_dir=(0, 0, 1))):
        Polygon((0.4445, -2.794), (0.4445, -2.832154649), (0.508, -2.794), align=None)
    revolve(axis=Axis((13.853001, 0, -13.27999764), (0, 1, 0)), mode=Mode.SUBTRACT)

    # Cut-Extrude6 13 outline → Cut-Extrude6 13 (revolve, cut)
    with BuildSketch(Plane(origin=(-13.853001, 0, -14.9999965), x_dir=(1, 0, 0), z_dir=(0, 0, 1))):
        Polygon((0.4445, -2.794), (0.4445, -2.832154649), (0.508, -2.794), align=None)
    revolve(axis=Axis((-13.853001, 0, -14.9999965), (0, 1, 0)), mode=Mode.SUBTRACT)

    # Cut-Extrude6 14 outline → Cut-Extrude6 14 (revolve, cut)
    with BuildSketch(Plane(origin=(13.853001, 0, -14.77999694), x_dir=(1, 0, 0), z_dir=(0, 0, 1))):
        Polygon((0.4445, -2.794), (0.4445, -2.832154649), (0.508, -2.794), align=None)
    revolve(axis=Axis((13.853001, 0, -14.77999694), (0, 1, 0)), mode=Mode.SUBTRACT)

    # Cut-Extrude6 15 outline → Cut-Extrude6 15 (revolve, cut)
    with BuildSketch(Plane(origin=(-13.853001, 0, -16.4999958), x_dir=(1, 0, 0), z_dir=(0, 0, 1))):
        Polygon((0.4445, -2.794), (0.4445, -2.832154649), (0.508, -2.794), align=None)
    revolve(axis=Axis((-13.853001, 0, -16.4999958), (0, 1, 0)), mode=Mode.SUBTRACT)

    # Cut-Extrude6 16 outline → Cut-Extrude6 16 (revolve, cut)
    with BuildSketch(Plane(origin=(13.853001, 0, -16.27999624), x_dir=(1, 0, 0), z_dir=(0, 0, 1))):
        Polygon((0.4445, -2.794), (0.4445, -2.832154649), (0.508, -2.794), align=None)
    revolve(axis=Axis((13.853001, 0, -16.27999624), (0, 1, 0)), mode=Mode.SUBTRACT)

    # Cut-Extrude6 17 outline → Cut-Extrude6 17 (revolve, cut)
    with BuildSketch(Plane(origin=(-13.853001, 0, -17.9999951), x_dir=(1, 0, 0), z_dir=(0, 0, 1))):
        Polygon((0.4445, -2.794), (0.4445, -2.832154649), (0.508, -2.794), align=None)
    revolve(axis=Axis((-13.853001, 0, -17.9999951), (0, 1, 0)), mode=Mode.SUBTRACT)

    # Cut-Extrude6 18 outline → Cut-Extrude6 18 (revolve, cut)
    with BuildSketch(Plane(origin=(13.853001, 0, -17.77999554), x_dir=(1, 0, 0), z_dir=(0, 0, 1))):
        Polygon((0.4445, -2.794), (0.4445, -2.832154649), (0.508, -2.794), align=None)
    revolve(axis=Axis((13.853001, 0, -17.77999554), (0, 1, 0)), mode=Mode.SUBTRACT)

    # #39 (0.0995) Diameter Hole1
    with Locations(Plane(origin=(0, -12.599999946, 0), x_dir=(-1, 0, 0), z_dir=(0, -1, 0))):
        with Locations((20.32, 6.35), (0, 19.05), (-20.32, 6.35)):
            Hole(F_39_0_0995_DIAMETER_HOLE1_D / 2, depth=F_39_0_0995_DIAMETER_HOLE1_DEPTH)
            with Locations((0, 0, -(F_39_0_0995_DIAMETER_HOLE1_DEPTH + F_39_0_0995_DIAMETER_HOLE1_TIP / 2))):  # 118° drill point
                Cone(0, F_39_0_0995_DIAMETER_HOLE1_D / 2, F_39_0_0995_DIAMETER_HOLE1_TIP, mode=Mode.SUBTRACT)


solid = part.part
